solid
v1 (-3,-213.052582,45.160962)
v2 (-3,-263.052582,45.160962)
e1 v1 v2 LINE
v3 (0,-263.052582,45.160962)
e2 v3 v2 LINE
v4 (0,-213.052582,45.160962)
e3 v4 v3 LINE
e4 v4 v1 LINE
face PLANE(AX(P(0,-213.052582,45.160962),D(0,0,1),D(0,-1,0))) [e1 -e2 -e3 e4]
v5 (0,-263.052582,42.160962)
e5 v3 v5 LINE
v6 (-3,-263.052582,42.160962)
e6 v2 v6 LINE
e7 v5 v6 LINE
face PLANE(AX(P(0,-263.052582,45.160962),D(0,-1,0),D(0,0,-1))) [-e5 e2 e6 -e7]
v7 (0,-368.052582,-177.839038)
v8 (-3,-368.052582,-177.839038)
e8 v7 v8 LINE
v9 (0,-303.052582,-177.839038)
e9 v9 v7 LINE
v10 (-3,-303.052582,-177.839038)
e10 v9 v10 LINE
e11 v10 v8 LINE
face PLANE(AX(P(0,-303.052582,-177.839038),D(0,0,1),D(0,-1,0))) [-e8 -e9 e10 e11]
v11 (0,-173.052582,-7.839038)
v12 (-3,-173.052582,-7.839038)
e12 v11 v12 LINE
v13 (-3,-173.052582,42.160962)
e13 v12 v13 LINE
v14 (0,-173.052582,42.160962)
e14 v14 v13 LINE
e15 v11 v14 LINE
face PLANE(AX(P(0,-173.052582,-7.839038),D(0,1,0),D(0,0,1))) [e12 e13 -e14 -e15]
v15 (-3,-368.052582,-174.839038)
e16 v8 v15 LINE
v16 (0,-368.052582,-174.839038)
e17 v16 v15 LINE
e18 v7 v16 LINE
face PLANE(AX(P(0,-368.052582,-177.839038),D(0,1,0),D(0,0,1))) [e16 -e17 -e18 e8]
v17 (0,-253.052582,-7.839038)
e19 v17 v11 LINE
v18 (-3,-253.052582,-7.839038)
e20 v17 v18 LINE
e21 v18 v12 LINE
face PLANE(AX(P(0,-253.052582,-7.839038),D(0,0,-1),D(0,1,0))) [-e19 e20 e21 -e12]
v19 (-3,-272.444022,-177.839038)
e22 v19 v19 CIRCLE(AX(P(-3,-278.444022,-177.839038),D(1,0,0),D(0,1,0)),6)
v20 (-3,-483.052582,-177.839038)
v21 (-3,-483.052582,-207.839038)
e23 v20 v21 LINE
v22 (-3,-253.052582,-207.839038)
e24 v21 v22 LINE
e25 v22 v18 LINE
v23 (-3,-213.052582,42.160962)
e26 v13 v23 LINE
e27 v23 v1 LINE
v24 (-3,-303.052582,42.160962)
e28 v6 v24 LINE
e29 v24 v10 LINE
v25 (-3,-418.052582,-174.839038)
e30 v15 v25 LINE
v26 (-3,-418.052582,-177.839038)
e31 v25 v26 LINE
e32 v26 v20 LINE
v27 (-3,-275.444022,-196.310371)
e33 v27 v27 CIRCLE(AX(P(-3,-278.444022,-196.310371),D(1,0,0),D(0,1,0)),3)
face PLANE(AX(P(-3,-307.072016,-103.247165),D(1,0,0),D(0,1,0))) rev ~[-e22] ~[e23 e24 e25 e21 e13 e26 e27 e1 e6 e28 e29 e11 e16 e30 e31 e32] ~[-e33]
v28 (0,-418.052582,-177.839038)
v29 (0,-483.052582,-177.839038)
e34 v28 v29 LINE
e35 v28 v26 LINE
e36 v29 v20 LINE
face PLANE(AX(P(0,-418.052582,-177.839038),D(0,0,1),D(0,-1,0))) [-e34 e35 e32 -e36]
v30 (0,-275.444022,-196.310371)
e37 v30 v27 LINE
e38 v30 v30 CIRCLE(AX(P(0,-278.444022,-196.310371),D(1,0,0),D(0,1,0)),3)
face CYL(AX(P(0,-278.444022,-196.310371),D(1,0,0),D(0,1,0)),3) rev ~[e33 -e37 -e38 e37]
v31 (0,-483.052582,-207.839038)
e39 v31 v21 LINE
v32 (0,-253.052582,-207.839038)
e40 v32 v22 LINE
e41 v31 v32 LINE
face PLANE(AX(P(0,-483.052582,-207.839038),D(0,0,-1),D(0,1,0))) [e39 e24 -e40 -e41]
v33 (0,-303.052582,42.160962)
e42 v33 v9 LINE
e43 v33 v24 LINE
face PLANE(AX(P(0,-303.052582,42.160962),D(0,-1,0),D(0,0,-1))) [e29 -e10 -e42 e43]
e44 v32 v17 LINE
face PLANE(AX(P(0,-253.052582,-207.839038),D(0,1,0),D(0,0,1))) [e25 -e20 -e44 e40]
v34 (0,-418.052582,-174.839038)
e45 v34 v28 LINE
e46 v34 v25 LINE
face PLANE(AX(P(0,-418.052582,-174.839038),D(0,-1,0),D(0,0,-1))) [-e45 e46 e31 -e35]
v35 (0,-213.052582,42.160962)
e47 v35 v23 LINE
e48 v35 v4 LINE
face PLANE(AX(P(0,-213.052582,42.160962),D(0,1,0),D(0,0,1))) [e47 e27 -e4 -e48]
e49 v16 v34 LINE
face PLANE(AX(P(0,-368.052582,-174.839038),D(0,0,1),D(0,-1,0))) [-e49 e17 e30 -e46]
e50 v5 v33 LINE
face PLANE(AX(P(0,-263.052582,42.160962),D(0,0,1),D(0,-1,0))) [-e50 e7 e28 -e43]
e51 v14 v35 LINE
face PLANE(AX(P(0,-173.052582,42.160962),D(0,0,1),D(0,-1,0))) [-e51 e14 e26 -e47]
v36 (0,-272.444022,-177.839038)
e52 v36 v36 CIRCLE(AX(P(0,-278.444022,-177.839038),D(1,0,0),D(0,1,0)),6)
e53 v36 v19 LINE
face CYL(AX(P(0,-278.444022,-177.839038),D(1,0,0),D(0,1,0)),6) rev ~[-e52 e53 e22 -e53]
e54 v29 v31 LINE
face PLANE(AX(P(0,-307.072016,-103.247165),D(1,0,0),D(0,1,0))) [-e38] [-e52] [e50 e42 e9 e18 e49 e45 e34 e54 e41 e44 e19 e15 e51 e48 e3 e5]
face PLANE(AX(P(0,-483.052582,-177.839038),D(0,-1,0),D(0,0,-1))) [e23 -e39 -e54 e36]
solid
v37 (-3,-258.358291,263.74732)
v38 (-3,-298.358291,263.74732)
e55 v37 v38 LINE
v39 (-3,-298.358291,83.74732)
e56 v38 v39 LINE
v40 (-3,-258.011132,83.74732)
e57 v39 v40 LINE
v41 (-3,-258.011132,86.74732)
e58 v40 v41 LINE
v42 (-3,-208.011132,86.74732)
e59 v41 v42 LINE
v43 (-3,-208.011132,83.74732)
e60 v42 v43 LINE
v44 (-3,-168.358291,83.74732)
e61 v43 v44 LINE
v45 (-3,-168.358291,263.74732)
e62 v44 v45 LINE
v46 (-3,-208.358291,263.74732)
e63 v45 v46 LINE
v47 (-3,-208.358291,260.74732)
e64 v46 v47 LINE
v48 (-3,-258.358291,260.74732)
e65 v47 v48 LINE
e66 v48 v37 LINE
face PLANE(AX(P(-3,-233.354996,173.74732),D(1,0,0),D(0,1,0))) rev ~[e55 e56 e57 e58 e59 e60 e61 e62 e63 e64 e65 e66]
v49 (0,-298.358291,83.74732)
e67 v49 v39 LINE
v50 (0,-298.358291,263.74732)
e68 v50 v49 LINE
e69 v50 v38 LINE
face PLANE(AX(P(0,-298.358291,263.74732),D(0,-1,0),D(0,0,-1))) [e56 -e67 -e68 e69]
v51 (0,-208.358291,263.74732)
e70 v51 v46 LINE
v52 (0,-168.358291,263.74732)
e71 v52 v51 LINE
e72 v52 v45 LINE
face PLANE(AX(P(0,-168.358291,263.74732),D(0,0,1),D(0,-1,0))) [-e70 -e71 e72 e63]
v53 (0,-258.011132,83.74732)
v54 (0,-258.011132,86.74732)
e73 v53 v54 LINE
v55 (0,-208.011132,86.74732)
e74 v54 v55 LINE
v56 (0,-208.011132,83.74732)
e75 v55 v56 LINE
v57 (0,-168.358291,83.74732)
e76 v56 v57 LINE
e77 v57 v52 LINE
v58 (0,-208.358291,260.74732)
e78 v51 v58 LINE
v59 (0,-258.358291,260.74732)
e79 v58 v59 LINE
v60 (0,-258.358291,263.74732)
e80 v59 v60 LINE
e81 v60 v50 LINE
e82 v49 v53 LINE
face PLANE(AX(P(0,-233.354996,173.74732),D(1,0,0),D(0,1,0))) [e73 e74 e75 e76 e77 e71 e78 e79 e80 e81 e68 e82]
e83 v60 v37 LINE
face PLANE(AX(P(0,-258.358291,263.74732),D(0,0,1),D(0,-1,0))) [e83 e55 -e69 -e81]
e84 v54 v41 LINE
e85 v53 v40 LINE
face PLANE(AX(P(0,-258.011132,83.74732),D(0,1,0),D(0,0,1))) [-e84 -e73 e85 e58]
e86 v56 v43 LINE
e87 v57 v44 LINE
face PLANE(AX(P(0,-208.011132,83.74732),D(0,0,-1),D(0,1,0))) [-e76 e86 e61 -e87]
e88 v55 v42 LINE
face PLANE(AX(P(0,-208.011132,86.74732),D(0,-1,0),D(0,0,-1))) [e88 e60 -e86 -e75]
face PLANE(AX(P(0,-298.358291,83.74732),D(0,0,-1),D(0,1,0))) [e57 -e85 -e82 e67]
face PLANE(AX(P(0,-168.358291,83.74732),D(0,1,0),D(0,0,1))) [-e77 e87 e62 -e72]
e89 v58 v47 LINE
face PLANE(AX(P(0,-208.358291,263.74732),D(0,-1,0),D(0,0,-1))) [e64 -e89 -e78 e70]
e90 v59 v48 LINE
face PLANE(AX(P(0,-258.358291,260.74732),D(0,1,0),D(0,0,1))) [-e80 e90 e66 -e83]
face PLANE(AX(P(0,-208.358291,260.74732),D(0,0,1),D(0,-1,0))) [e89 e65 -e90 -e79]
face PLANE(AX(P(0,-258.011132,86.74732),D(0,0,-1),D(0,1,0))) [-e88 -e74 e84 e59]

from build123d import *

# Parameters (mm, degrees)
F0_R     = 3
F0_R_2   = 6
F1_DEPTH = 3


with BuildPart() as f1:
    # F0 (on Right) → F1 (new body)
    with BuildSketch(Plane.YZ):
        Polygon((-263.0525815487, 42.160961777), (-298.0525815487, 42.160961777), (-303.0525815487, 42.160961777), (-303.0525815487, 37.160961777), (-303.0525815487, -177.839038223), (-368.0525815487, -177.839038223), (-368.0525815487, -174.839038223), (-418.0525815487, -174.839038223), (-418.0525815487, -177.839038223), (-483.0525815487, -177.839038223), (-483.0525815487, -207.839038223), (-253.0525815487, -207.839038223), (-253.0525815487, -12.839038223), (-253.0525815487, -7.839038223), (-248.0525815487, -7.839038223), (-178.0525815487, -7.839038223), (-173.0525815487, -7.839038223), (-173.0525815487, -2.839038223), (-173.0525815487, 37.160961777), (-173.0525815487, 42.160961777), (-178.0525815487, 42.160961777), (-213.0525815487, 42.160961777), (-213.0525815487, 45.160961777), (-263.0525815487, 45.160961777), align=None)
        with Locations((-278.4440219402, -196.3103711605)):
            Circle(F0_R, mode=Mode.SUBTRACT)
        with Locations((-278.4440219402, -177.839038223)):
            Circle(F0_R_2, mode=Mode.SUBTRACT)
    extrude(amount=-F1_DEPTH)


with BuildPart() as f1b:
    # F0 (on Right) → F1, piece 2 (new body)
    with BuildSketch(Plane.YZ):
        Polygon((-298.3582913876, 263.7473198771), (-298.3582913876, 83.7473198771), (-258.0111324787, 83.7473198771), (-258.0111324787, 86.7473198771), (-208.0111324787, 86.7473198771), (-208.0111324787, 83.7473198771), (-168.3582913876, 83.7473198771), (-168.3582913876, 263.7473198771), (-208.3582913876, 263.7473198771), (-208.3582913876, 260.7473198771), (-258.3582913876, 260.7473198771), (-258.3582913876, 263.7473198771), align=None)
    extrude(amount=-F1_DEPTH)


solid = Compound([f1.part, f1b.part])
